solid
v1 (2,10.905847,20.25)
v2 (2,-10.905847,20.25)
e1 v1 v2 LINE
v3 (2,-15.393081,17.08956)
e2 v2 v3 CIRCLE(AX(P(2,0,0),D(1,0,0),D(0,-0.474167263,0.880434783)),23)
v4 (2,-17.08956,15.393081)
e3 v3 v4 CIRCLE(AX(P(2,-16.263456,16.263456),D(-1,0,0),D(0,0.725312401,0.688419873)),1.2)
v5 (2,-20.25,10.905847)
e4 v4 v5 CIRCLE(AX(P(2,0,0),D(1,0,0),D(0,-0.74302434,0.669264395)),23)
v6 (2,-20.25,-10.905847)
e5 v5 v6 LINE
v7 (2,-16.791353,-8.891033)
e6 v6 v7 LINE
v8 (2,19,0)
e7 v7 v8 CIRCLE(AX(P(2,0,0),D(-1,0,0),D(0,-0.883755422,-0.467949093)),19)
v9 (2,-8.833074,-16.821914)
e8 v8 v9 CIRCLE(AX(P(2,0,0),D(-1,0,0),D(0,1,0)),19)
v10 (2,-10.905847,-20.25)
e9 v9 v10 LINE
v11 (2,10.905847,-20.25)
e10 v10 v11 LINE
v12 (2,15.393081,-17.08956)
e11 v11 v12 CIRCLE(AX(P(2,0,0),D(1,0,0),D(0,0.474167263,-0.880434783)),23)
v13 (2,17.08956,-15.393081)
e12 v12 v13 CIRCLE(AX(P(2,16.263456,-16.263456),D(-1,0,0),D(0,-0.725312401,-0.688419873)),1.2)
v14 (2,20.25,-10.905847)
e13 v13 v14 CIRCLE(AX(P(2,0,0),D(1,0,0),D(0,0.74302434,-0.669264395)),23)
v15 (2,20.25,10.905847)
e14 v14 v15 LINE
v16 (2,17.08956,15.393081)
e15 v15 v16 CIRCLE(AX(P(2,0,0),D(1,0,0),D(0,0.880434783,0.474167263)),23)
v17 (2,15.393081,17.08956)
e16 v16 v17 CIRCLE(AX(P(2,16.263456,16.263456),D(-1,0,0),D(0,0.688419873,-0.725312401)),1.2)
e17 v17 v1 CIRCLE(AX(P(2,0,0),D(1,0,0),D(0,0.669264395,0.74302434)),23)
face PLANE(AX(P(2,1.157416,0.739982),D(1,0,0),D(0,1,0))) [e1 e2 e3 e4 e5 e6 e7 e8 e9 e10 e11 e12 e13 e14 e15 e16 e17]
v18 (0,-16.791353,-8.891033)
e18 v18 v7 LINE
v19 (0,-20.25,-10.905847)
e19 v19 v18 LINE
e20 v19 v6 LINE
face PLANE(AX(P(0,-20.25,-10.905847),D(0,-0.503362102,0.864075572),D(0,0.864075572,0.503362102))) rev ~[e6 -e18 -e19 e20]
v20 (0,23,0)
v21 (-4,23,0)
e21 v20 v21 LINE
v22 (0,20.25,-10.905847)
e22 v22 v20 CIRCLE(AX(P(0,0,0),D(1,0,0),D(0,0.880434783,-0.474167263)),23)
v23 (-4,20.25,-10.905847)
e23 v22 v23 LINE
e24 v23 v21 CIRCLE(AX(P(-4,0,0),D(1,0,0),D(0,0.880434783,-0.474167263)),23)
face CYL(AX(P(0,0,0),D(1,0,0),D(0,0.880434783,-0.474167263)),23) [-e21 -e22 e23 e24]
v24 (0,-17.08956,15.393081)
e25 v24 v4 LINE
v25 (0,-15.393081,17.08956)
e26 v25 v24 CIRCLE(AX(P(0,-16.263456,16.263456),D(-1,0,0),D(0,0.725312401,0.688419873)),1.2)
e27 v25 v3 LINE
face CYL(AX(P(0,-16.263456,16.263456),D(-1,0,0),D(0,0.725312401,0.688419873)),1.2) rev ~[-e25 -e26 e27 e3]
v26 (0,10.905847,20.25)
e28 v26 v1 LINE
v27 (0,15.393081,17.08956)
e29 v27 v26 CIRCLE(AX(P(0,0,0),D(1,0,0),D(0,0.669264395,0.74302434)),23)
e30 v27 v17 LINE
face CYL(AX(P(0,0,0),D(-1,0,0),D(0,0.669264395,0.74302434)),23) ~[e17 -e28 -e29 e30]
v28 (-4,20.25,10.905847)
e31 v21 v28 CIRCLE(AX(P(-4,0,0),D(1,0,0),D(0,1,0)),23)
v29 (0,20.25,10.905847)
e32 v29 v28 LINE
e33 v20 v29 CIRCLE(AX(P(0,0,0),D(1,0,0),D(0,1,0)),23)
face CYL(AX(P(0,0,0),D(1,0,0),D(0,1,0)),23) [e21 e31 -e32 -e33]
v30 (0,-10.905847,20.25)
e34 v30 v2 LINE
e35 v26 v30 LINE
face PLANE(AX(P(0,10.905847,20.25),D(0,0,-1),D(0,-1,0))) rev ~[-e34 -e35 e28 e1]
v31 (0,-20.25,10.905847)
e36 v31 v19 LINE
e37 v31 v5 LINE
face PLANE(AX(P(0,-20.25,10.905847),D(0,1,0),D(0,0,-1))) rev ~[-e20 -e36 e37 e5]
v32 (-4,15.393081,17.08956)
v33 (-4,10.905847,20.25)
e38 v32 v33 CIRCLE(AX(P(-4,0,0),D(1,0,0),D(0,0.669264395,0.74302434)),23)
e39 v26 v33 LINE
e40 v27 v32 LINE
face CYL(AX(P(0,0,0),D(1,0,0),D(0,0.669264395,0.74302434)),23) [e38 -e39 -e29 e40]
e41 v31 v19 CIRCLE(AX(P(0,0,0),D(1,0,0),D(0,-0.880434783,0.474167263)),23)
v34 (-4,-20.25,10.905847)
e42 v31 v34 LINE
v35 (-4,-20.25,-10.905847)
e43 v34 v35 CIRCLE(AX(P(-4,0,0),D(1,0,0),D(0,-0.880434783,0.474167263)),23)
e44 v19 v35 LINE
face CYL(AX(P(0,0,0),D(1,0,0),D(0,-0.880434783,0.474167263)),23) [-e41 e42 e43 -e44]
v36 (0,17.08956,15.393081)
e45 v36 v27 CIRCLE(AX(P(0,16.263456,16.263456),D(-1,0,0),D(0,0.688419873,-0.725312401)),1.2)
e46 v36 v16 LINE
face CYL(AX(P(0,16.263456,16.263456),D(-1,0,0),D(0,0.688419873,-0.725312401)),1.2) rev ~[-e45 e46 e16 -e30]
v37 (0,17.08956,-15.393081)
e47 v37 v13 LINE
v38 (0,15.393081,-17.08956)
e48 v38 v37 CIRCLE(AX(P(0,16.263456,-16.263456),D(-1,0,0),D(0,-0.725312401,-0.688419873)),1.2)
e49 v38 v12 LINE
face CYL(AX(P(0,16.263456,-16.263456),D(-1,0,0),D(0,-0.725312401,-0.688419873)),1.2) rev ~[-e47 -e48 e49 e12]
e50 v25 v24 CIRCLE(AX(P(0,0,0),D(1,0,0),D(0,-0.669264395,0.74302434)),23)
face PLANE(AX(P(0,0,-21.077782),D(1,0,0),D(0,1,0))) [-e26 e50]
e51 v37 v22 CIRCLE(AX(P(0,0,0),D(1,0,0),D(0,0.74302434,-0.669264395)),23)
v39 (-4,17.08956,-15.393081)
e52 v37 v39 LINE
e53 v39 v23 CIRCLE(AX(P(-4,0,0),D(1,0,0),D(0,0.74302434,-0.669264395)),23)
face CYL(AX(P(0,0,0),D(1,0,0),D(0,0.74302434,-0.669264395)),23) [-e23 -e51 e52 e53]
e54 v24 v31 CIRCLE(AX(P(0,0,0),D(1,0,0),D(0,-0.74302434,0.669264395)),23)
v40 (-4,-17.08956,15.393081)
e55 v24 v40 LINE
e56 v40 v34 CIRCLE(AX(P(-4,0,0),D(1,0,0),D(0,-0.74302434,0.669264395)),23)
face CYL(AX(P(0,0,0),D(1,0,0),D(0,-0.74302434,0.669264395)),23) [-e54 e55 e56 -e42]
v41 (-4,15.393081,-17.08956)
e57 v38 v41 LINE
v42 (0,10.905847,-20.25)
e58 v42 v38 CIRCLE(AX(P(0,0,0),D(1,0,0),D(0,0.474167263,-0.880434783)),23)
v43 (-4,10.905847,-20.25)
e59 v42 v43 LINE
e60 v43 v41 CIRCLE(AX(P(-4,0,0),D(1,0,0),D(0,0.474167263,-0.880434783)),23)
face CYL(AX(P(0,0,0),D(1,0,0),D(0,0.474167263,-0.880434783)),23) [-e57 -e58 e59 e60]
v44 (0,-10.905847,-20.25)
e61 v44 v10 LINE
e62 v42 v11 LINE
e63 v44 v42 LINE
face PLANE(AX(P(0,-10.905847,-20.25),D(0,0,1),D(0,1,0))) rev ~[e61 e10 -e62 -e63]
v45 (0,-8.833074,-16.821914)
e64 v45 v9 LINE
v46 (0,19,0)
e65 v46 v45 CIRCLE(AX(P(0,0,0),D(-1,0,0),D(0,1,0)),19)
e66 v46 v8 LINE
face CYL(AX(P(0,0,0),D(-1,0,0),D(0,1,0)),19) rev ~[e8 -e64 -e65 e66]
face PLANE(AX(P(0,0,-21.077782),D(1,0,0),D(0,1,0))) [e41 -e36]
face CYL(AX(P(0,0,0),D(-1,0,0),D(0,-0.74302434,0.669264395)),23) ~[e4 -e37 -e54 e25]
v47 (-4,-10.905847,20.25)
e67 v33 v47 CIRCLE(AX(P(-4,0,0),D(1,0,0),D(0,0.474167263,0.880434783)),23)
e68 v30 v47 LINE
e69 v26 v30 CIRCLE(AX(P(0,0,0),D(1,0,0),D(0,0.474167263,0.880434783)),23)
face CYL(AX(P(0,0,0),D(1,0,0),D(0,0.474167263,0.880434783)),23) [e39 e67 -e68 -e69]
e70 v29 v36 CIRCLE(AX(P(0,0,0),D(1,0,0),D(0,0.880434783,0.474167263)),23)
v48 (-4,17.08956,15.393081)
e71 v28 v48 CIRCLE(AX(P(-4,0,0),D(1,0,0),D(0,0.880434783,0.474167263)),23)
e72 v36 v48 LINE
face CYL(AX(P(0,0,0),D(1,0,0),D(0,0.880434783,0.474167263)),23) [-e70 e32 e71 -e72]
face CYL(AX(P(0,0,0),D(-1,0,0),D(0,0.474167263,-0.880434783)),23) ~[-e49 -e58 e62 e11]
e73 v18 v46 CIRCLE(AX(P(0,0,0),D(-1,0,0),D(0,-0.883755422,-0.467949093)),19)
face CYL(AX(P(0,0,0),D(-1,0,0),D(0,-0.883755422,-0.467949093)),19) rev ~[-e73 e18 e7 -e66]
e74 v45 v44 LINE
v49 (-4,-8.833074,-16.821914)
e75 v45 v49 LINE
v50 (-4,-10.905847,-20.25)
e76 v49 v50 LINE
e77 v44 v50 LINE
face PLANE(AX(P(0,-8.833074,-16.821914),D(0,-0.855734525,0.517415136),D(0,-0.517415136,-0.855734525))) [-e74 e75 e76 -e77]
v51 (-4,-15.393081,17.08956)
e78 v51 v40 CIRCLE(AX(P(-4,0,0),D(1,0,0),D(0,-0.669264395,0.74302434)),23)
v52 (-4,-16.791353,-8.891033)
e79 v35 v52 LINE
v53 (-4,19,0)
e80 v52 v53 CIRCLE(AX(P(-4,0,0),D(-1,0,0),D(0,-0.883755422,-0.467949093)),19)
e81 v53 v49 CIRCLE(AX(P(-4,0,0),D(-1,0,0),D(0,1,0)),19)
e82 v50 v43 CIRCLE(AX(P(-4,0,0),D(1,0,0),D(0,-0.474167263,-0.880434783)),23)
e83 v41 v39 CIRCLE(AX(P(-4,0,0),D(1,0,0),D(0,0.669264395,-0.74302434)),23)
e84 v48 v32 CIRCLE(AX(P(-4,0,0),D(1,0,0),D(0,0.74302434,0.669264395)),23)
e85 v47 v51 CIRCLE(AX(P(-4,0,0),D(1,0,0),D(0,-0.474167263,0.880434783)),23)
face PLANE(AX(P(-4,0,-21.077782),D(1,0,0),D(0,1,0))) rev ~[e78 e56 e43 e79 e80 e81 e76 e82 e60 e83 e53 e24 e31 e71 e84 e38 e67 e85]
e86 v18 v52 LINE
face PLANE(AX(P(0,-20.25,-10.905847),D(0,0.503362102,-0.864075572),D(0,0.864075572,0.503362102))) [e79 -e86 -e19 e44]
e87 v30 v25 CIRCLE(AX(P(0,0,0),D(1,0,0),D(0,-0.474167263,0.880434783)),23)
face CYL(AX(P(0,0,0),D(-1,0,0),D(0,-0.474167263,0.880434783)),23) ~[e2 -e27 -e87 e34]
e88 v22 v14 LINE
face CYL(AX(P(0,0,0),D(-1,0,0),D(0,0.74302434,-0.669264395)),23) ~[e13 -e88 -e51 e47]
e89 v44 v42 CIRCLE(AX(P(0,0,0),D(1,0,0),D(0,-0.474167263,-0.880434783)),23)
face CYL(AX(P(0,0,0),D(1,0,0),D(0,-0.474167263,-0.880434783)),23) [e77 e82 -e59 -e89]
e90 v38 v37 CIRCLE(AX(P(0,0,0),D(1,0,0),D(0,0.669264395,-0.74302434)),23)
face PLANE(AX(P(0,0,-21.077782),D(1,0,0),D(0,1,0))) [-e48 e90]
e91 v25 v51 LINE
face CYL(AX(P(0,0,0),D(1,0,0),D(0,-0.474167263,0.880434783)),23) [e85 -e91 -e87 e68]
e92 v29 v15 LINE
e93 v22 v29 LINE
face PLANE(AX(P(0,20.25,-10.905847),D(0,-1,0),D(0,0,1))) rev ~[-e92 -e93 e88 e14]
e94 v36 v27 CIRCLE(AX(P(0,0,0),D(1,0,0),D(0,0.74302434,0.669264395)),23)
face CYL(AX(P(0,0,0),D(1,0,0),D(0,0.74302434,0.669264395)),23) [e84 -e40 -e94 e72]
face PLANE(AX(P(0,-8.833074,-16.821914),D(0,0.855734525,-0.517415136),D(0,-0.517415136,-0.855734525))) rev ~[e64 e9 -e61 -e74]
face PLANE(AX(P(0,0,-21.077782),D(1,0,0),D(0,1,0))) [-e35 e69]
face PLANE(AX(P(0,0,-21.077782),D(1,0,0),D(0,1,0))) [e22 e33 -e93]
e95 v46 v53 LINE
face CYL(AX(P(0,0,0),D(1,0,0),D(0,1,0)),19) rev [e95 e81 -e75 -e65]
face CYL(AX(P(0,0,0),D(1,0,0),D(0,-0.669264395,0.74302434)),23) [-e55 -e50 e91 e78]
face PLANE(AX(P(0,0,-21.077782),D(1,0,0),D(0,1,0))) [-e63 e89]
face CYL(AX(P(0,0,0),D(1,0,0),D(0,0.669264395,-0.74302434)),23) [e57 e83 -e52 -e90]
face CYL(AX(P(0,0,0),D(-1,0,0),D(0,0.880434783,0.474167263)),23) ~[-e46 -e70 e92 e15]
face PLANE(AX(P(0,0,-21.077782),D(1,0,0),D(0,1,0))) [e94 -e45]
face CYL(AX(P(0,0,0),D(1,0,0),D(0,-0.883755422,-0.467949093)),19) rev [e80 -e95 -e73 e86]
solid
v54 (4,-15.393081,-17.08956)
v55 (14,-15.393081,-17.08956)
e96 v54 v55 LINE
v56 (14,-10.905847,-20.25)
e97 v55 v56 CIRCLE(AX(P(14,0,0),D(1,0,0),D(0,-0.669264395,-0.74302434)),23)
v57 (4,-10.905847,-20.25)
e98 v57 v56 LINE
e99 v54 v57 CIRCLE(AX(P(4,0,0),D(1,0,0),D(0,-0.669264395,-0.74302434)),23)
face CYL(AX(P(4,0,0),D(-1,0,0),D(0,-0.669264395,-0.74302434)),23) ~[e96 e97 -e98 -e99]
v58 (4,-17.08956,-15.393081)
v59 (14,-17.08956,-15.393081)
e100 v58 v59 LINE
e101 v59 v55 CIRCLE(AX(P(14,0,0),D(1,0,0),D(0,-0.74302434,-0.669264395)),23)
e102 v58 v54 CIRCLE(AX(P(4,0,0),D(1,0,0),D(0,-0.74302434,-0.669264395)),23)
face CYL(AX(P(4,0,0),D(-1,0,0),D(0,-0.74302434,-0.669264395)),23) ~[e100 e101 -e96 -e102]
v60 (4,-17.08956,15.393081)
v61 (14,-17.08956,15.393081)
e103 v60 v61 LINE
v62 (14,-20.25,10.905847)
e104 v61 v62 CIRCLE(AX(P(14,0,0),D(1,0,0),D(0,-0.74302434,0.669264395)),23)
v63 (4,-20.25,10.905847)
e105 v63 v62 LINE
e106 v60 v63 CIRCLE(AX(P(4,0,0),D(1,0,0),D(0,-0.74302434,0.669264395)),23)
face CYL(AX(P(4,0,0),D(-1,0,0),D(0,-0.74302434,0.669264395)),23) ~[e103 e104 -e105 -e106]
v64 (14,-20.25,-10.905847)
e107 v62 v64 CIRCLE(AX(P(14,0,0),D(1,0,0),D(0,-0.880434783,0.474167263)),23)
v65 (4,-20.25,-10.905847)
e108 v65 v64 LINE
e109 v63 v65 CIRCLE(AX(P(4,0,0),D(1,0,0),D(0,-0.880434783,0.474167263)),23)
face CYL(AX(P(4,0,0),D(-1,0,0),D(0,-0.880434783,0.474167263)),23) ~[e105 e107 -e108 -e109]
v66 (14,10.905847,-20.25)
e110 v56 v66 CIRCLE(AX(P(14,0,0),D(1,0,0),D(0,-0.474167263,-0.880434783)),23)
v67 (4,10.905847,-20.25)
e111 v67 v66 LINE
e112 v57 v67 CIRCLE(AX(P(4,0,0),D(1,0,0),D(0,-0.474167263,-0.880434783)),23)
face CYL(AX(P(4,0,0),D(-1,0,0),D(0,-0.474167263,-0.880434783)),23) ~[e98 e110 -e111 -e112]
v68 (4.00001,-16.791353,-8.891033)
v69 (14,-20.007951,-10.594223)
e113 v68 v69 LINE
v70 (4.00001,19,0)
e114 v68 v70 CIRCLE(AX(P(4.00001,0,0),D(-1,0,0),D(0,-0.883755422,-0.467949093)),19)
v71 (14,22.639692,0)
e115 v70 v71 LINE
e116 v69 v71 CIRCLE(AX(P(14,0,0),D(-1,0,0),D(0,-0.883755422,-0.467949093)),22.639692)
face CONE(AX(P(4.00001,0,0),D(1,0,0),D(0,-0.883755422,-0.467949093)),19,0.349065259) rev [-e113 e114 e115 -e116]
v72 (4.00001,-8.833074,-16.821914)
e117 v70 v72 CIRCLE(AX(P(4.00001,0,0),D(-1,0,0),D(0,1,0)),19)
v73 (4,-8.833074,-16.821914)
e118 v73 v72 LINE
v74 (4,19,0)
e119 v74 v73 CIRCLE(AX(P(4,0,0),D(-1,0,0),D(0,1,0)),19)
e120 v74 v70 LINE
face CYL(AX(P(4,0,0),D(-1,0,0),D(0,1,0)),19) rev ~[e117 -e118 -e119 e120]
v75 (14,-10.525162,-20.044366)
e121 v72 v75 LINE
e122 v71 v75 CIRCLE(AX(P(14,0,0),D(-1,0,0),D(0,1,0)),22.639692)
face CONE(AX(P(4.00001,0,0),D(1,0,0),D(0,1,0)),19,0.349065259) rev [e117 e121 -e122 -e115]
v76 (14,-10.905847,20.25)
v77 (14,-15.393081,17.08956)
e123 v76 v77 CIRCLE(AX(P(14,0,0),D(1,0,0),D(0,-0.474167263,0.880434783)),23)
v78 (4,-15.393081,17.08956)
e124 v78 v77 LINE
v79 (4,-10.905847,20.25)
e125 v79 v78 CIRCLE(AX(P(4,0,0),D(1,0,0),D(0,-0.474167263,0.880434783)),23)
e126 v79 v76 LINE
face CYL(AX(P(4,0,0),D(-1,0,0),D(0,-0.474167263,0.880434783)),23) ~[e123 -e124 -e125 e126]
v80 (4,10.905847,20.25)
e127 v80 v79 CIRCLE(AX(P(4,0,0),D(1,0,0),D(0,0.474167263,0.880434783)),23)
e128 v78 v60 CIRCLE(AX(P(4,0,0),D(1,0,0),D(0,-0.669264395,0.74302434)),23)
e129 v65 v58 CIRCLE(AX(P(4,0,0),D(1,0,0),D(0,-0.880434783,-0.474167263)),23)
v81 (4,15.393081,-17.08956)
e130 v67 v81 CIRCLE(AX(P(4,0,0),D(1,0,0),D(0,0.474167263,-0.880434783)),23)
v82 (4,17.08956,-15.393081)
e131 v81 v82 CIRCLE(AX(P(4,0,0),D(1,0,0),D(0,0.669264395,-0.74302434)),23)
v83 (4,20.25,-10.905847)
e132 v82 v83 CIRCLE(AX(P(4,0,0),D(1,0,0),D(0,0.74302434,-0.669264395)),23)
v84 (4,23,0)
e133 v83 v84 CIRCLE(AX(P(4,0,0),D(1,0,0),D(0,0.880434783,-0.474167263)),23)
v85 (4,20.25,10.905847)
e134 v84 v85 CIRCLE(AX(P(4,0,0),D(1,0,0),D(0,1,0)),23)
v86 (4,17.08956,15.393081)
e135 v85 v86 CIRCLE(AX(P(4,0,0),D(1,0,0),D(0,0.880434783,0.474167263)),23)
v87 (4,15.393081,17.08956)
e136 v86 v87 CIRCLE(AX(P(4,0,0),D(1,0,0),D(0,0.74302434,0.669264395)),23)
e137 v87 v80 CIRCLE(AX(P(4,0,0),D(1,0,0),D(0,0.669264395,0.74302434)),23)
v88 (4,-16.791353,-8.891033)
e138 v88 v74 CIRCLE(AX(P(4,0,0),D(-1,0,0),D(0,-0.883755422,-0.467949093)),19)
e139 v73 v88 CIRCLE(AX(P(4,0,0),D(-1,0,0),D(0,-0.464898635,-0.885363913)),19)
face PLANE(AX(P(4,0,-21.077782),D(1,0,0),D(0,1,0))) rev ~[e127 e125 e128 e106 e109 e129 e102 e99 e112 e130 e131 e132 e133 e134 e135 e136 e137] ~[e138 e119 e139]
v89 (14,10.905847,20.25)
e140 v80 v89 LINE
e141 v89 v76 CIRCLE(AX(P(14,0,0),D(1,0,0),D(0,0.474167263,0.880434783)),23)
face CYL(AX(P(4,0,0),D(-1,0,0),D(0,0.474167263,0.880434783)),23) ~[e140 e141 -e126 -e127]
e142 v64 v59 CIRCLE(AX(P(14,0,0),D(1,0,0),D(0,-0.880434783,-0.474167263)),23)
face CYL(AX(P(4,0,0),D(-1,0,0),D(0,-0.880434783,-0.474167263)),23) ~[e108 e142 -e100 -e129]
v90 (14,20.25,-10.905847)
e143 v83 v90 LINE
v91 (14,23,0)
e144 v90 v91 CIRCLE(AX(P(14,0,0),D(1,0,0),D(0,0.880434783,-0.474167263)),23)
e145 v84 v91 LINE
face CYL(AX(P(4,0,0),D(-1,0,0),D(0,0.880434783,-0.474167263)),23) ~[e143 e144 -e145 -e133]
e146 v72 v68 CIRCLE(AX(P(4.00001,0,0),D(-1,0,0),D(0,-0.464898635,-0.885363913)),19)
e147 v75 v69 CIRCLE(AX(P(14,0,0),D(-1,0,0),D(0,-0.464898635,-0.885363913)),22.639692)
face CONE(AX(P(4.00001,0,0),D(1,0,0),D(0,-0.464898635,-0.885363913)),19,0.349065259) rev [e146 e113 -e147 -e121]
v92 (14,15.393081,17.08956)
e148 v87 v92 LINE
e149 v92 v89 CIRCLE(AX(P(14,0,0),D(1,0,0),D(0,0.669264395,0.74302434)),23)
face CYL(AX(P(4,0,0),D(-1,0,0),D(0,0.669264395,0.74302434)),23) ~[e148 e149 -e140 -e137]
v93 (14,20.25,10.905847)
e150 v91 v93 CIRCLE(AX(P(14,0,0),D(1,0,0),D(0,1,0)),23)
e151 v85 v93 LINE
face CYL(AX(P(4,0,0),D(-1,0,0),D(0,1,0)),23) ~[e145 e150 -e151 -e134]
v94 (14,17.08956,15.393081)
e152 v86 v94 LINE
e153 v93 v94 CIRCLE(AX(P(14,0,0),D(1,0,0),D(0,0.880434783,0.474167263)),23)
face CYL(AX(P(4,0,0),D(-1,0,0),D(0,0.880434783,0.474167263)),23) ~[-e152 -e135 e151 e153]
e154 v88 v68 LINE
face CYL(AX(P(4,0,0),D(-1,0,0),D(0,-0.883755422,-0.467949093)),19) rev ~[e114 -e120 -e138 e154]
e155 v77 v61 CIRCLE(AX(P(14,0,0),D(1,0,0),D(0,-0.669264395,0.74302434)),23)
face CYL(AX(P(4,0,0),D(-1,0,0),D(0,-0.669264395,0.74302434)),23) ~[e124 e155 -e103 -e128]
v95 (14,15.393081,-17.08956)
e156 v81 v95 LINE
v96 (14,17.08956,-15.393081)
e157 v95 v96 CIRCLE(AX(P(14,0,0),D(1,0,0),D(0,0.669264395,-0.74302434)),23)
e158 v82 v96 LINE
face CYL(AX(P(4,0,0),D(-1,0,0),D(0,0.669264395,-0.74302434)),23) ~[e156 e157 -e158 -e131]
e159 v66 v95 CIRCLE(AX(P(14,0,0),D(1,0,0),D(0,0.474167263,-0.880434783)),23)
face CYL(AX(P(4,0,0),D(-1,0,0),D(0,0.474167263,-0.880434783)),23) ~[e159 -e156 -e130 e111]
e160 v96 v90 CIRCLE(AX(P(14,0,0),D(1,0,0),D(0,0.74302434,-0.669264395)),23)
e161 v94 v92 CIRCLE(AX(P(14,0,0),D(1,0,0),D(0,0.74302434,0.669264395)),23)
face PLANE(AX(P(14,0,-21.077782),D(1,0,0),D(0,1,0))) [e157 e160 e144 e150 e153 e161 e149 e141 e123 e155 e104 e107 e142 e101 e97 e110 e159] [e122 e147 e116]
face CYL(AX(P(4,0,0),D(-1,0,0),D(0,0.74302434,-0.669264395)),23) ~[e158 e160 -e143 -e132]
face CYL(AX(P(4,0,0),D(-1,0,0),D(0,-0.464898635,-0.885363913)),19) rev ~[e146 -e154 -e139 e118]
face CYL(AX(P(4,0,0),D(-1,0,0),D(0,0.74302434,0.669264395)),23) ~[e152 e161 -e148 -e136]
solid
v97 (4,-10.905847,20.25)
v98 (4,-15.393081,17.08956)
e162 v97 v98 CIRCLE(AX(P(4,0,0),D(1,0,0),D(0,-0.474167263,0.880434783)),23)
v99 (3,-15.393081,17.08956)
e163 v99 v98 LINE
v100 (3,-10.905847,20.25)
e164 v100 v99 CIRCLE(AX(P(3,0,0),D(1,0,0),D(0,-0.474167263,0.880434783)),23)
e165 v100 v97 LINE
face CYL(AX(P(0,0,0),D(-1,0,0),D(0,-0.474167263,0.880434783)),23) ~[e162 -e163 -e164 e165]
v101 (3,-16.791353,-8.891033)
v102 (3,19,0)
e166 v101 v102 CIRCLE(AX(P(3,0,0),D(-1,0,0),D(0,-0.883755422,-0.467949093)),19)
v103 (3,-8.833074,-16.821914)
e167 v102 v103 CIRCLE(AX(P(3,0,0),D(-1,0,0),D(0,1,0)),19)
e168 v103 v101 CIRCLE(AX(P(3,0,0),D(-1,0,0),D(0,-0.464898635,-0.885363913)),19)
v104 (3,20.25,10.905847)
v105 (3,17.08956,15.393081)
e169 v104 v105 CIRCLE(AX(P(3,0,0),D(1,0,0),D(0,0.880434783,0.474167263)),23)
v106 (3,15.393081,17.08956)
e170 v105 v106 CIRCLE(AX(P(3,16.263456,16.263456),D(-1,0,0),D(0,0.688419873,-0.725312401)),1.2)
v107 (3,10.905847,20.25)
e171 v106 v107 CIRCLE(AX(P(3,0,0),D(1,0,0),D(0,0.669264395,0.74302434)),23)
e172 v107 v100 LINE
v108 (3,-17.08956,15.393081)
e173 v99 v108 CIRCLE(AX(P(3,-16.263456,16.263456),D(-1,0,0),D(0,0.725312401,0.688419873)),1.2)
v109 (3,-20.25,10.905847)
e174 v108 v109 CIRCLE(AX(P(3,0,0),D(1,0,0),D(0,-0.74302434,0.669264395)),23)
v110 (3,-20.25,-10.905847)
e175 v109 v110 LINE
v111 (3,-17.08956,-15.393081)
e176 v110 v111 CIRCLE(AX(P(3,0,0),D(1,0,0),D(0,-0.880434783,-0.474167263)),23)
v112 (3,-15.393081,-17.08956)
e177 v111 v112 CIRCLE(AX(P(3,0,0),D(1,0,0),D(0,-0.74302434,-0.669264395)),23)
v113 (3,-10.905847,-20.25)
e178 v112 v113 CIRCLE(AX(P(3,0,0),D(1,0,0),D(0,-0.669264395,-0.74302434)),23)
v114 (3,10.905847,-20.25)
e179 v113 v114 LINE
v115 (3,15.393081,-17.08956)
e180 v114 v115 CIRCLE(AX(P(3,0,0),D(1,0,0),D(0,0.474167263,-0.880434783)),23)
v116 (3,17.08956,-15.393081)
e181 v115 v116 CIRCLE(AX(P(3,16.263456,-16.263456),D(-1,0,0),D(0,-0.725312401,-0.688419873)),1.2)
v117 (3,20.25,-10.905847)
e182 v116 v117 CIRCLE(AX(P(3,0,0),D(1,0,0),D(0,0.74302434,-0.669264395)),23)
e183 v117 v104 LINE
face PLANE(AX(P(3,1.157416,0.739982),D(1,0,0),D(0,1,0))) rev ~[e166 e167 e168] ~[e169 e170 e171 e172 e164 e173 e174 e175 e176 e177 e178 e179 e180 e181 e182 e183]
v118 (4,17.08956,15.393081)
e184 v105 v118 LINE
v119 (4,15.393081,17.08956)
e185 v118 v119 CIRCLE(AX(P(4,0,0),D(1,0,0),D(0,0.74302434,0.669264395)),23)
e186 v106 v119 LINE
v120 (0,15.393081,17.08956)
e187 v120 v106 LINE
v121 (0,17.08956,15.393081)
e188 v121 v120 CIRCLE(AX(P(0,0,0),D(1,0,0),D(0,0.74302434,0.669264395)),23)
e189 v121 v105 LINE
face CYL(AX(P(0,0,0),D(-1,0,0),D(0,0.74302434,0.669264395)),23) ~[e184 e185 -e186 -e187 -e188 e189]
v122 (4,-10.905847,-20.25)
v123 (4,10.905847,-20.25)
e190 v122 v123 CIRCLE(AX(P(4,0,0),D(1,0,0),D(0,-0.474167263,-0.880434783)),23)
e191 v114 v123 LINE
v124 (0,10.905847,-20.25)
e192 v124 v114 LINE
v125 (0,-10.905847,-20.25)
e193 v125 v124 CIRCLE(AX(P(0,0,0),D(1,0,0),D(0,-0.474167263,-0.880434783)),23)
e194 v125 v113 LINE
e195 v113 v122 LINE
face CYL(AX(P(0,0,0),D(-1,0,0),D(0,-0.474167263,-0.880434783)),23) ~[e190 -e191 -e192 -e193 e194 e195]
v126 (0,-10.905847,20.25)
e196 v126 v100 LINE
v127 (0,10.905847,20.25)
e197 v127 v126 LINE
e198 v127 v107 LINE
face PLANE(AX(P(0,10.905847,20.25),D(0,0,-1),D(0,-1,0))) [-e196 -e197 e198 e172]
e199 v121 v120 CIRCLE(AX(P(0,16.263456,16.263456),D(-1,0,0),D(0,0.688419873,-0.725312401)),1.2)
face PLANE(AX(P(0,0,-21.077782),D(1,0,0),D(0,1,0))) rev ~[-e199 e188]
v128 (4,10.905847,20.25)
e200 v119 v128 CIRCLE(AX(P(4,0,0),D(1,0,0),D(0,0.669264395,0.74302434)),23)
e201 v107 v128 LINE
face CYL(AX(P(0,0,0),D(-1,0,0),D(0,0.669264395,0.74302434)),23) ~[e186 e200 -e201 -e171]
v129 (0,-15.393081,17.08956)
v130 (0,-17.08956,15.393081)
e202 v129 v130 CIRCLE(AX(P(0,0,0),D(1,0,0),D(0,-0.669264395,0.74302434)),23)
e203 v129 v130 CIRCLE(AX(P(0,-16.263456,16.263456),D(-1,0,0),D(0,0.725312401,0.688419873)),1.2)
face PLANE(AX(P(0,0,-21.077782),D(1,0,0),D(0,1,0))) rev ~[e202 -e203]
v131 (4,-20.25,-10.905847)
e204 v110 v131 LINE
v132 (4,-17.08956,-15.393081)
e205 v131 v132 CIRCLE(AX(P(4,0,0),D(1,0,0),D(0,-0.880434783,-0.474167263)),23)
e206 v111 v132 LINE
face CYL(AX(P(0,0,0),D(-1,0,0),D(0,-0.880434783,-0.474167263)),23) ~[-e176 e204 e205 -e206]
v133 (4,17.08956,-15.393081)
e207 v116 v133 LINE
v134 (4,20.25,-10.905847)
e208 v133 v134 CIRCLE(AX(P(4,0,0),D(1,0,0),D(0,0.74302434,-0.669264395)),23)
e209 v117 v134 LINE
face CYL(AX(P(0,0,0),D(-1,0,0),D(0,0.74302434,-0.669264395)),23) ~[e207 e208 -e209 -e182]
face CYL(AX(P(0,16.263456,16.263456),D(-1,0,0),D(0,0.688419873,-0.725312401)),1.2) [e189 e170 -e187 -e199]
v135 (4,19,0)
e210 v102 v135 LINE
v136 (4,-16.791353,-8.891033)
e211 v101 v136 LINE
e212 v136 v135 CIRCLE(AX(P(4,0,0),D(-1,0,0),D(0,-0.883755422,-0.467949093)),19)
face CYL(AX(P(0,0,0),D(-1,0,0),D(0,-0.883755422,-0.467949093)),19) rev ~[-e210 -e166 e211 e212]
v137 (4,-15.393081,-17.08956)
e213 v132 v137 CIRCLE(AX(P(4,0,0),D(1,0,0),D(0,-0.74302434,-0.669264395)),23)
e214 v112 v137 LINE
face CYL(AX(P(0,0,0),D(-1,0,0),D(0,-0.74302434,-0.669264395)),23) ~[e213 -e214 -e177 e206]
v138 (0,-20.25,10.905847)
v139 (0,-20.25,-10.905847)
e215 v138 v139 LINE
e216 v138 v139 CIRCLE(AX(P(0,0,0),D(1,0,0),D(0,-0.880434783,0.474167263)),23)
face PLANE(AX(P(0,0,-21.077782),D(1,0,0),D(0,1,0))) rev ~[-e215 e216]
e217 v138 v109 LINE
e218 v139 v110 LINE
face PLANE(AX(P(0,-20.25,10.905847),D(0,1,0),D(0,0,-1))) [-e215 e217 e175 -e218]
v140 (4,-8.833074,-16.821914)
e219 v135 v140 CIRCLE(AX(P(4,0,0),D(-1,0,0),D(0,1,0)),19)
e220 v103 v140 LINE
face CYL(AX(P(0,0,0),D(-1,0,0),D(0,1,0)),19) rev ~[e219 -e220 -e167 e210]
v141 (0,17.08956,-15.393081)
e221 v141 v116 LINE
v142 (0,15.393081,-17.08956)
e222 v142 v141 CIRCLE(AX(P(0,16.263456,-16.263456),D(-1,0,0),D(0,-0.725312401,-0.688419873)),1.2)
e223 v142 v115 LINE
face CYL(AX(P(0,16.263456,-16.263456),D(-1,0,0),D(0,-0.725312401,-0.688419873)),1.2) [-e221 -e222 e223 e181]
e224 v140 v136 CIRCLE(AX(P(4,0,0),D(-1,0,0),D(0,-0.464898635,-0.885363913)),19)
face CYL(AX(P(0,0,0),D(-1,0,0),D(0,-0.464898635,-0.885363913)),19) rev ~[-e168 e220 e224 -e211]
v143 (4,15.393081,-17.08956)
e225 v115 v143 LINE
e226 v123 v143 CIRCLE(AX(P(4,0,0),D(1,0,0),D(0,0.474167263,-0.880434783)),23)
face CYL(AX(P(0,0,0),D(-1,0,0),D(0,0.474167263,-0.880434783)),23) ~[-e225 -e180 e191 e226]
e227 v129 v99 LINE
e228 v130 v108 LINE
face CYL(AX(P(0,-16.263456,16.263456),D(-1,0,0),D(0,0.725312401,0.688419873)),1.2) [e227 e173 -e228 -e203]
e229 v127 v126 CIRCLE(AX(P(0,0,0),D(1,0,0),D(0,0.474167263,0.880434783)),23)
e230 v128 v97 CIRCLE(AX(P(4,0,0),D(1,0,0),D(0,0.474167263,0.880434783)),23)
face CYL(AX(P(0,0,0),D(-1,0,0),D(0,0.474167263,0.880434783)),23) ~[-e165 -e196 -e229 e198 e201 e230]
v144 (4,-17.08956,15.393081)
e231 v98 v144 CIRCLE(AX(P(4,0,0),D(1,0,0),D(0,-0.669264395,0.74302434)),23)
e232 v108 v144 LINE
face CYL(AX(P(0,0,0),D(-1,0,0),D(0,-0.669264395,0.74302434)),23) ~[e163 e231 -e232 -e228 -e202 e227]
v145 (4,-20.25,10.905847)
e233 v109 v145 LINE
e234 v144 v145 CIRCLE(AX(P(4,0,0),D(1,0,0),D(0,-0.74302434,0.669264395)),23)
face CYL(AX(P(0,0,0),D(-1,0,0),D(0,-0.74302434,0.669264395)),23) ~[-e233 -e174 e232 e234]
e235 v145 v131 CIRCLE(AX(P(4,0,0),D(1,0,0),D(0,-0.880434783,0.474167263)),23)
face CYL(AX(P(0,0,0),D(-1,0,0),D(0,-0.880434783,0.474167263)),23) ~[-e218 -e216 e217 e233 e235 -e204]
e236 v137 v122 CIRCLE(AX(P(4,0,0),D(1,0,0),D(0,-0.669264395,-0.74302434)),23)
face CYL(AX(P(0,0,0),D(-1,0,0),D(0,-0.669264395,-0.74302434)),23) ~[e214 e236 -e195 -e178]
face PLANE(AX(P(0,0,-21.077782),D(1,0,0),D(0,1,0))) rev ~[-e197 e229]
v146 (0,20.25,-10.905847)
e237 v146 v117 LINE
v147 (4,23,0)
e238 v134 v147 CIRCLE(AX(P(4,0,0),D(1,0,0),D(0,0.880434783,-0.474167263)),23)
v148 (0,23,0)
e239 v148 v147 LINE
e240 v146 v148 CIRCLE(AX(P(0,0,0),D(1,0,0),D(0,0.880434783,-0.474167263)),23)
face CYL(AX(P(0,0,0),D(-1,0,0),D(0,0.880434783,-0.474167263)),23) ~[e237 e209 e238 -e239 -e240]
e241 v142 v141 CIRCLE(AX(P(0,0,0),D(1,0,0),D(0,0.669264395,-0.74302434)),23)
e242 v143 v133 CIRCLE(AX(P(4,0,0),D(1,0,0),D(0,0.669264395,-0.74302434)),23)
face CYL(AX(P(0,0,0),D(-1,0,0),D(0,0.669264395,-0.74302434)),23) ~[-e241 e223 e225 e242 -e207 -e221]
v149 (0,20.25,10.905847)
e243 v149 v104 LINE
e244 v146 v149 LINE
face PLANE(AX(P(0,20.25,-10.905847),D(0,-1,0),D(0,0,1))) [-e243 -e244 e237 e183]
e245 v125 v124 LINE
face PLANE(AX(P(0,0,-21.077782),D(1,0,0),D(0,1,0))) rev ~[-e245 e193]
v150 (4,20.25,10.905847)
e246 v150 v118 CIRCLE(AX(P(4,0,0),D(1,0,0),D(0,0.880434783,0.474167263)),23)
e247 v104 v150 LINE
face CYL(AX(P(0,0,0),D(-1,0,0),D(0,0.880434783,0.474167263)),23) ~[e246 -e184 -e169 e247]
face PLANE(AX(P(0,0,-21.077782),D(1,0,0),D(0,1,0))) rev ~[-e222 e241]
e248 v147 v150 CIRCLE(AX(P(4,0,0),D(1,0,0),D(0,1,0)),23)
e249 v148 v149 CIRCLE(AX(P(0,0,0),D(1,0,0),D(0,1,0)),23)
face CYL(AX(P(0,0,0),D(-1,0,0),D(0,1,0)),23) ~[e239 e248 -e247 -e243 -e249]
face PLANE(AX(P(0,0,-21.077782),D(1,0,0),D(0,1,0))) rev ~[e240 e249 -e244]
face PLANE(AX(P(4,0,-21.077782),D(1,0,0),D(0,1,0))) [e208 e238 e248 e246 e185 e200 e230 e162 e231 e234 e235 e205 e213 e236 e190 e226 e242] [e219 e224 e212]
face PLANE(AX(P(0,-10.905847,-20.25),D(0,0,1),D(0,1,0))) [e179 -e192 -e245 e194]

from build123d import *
from build123d import SkipClean  # not in build123d's __all__

# Parameters (mm, degrees)
F1_DEPTH = 4
F2_DEPTH = 3
F3_DEPTH = 2
F4_DEPTH = 4
F5_DEPTH = 10
F6_SIZE2 = 3.639692
F6_SIZE  = 9.99999


# Not quite as in the source:
# - a fillet or chamfer is up to 0.001 mm smaller than in the source, because OpenCascade refuses the exact size


with BuildPart() as f1:
    # F0 (on Right) → F1 (new body)
    with BuildSketch(Plane.YZ):
        with BuildLine():
            ThreePointArc((-10.9058470556, -20.25), (0, -23), (10.9058470556, -20.25))
            Line((10.9058470556, -20.25), (-10.9058470556, -20.25))
        make_face()
        with BuildLine():
            Line((-10.9058470556, -20.25), (10.9058470556, -20.25))
            ThreePointArc((10.9058470556, -20.25), (13.2440741804, -18.8041085698), (15.3930810865, -17.0895598148))
            ThreePointArc((15.3930810865, -17.0895598148), (15.4149278299, -15.4149278299), (17.0895598148, -15.3930810865))
            ThreePointArc((17.0895598148, -15.3930810865), (18.8041085698, -13.2440741804), (20.25, -10.9058470556))
            Line((20.25, -10.9058470556), (20.25, 10.9058470556))
            ThreePointArc((20.25, 10.9058470556), (18.8041085698, 13.2440741804), (17.0895598148, 15.3930810865))
            ThreePointArc((17.0895598148, 15.3930810865), (15.4149278299, 15.4149278299), (15.3930810865, 17.0895598148))
            ThreePointArc((15.3930810865, 17.0895598148), (13.2440741804, 18.8041085698), (10.9058470556, 20.25))
            Line((10.9058470556, 20.25), (-10.9058470556, 20.25))
            ThreePointArc((-10.9058470556, 20.25), (-13.2440741804, 18.8041085698), (-15.3930810865, 17.0895598148))
            ThreePointArc((-15.3930810865, 17.0895598148), (-15.4149278299, 15.4149278299), (-17.0895598148, 15.3930810865))
            ThreePointArc((-17.0895598148, 15.3930810865), (-18.8041085698, 13.2440741804), (-20.25, 10.9058470556))
            Line((-20.25, 10.9058470556), (-20.25, -10.9058470556))
            Line((-20.25, -10.9058470556), (-16.7913530234, -8.8910327658))
            ThreePointArc((-16.7913530234, -8.8910327658), (-4.5806272799, 18.4395730353), (19, 0))
            ThreePointArc((19, 0), (9.8278072985, -16.2608180515), (-8.833074074, -16.8219143501))
            Line((-8.833074074, -16.8219143501), (-10.9058470556, -20.25))
        make_face()
        with BuildLine():
            ThreePointArc((-15.3930810865, -17.0895598148), (-13.2440741804, -18.8041085698), (-10.9058470556, -20.25))
            Line((-10.9058470556, -20.25), (-8.833074074, -16.8219143501))
            ThreePointArc((-8.833074074, -16.8219143501), (-13.4118431505, -13.4581745904), (-16.7913530234, -8.8910327658))
            Line((-16.7913530234, -8.8910327658), (-20.25, -10.9058470556))
            ThreePointArc((-20.25, -10.9058470556), (-18.8041085698, -13.2440741804), (-17.0895598148, -15.3930810865))
            ThreePointArc((-17.0895598148, -15.3930810865), (-15.4149278299, -15.4149278299), (-15.3930810865, -17.0895598148))
        make_face()
        with BuildLine():
            ThreePointArc((17.0895598148, -15.3930810865), (15.4149278299, -15.4149278299), (15.3930810865, -17.0895598148))
            ThreePointArc((15.3930810865, -17.0895598148), (16.2634559673, -16.2634559673), (17.0895598148, -15.3930810865))
        make_face()
        with BuildLine():
            ThreePointArc((-17.0895598148, -15.3930810865), (-16.2634559673, -16.2634559673), (-15.3930810865, -17.0895598148))
            ThreePointArc((-15.3930810865, -17.0895598148), (-15.4149278299, -15.4149278299), (-17.0895598148, -15.3930810865))
        make_face()
        with BuildLine():
            Line((20.25, 10.9058470556), (20.25, -10.9058470556))
            ThreePointArc((20.25, -10.9058470556), (22.3019057482, -5.6236109396), (23, 0))
            ThreePointArc((23, 0), (22.3019057482, 5.6236109396), (20.25, 10.9058470556))
        make_face()
        with BuildLine():
            ThreePointArc((-20.25, 10.9058470556), (-23, 0), (-20.25, -10.9058470556))
            Line((-20.25, -10.9058470556), (-20.25, 10.9058470556))
        make_face()
        with BuildLine():
            ThreePointArc((15.3930810865, 17.0895598148), (15.4149278299, 15.4149278299), (17.0895598148, 15.3930810865))
            ThreePointArc((17.0895598148, 15.3930810865), (16.2634559673, 16.2634559673), (15.3930810865, 17.0895598148))
        make_face()
        with BuildLine():
            ThreePointArc((-15.3930810865, 17.0895598148), (-16.2634559673, 16.2634559673), (-17.0895598148, 15.3930810865))
            ThreePointArc((-17.0895598148, 15.3930810865), (-15.4149278299, 15.4149278299), (-15.3930810865, 17.0895598148))
        make_face()
        with BuildLine():
            Line((-10.9058470556, 20.25), (10.9058470556, 20.25))
            ThreePointArc((10.9058470556, 20.25), (0, 23), (-10.9058470556, 20.25))
        make_face()
    extrude(amount=F1_DEPTH)

    # F0 (on Right) → F2 (cut)
    with BuildSketch(Plane.YZ):
        with BuildLine():
            Line((-10.9058470556, -20.25), (10.9058470556, -20.25))
            ThreePointArc((10.9058470556, -20.25), (13.2440741804, -18.8041085698), (15.3930810865, -17.0895598148))
            ThreePointArc((15.3930810865, -17.0895598148), (15.4149278299, -15.4149278299), (17.0895598148, -15.3930810865))
            ThreePointArc((17.0895598148, -15.3930810865), (18.8041085698, -13.2440741804), (20.25, -10.9058470556))
            Line((20.25, -10.9058470556), (20.25, 10.9058470556))
            ThreePointArc((20.25, 10.9058470556), (18.8041085698, 13.2440741804), (17.0895598148, 15.3930810865))
            ThreePointArc((17.0895598148, 15.3930810865), (15.4149278299, 15.4149278299), (15.3930810865, 17.0895598148))
            ThreePointArc((15.3930810865, 17.0895598148), (13.2440741804, 18.8041085698), (10.9058470556, 20.25))
            Line((10.9058470556, 20.25), (-10.9058470556, 20.25))
            ThreePointArc((-10.9058470556, 20.25), (-13.2440741804, 18.8041085698), (-15.3930810865, 17.0895598148))
            ThreePointArc((-15.3930810865, 17.0895598148), (-15.4149278299, 15.4149278299), (-17.0895598148, 15.3930810865))
            ThreePointArc((-17.0895598148, 15.3930810865), (-18.8041085698, 13.2440741804), (-20.25, 10.9058470556))
            Line((-20.25, 10.9058470556), (-20.25, -10.9058470556))
            Line((-20.25, -10.9058470556), (-16.7913530234, -8.8910327658))
            ThreePointArc((-16.7913530234, -8.8910327658), (-4.5806272799, 18.4395730353), (19, 0))
            ThreePointArc((19, 0), (9.8278072985, -16.2608180515), (-8.833074074, -16.8219143501))
            Line((-8.833074074, -16.8219143501), (-10.9058470556, -20.25))
        make_face()
        with BuildLine():
            ThreePointArc((-15.3930810865, -17.0895598148), (-13.2440741804, -18.8041085698), (-10.9058470556, -20.25))
            Line((-10.9058470556, -20.25), (-8.833074074, -16.8219143501))
            ThreePointArc((-8.833074074, -16.8219143501), (-13.4118431505, -13.4581745904), (-16.7913530234, -8.8910327658))
            Line((-16.7913530234, -8.8910327658), (-20.25, -10.9058470556))
            ThreePointArc((-20.25, -10.9058470556), (-18.8041085698, -13.2440741804), (-17.0895598148, -15.3930810865))
            ThreePointArc((-17.0895598148, -15.3930810865), (-15.4149278299, -15.4149278299), (-15.3930810865, -17.0895598148))
        make_face()
        with BuildLine():
            ThreePointArc((-17.0895598148, -15.3930810865), (-16.2634559673, -16.2634559673), (-15.3930810865, -17.0895598148))
            ThreePointArc((-15.3930810865, -17.0895598148), (-15.4149278299, -15.4149278299), (-17.0895598148, -15.3930810865))
        make_face()
    extrude(amount=F2_DEPTH, mode=Mode.SUBTRACT)


with BuildPart() as f3:
    # F0 (on Right) → F3 (new body)
    with BuildSketch(Plane.YZ):
        with BuildLine():
            Line((-10.9058470556, -20.25), (10.9058470556, -20.25))
            ThreePointArc((10.9058470556, -20.25), (13.2440741804, -18.8041085698), (15.3930810865, -17.0895598148))
            ThreePointArc((15.3930810865, -17.0895598148), (15.4149278299, -15.4149278299), (17.0895598148, -15.3930810865))
            ThreePointArc((17.0895598148, -15.3930810865), (18.8041085698, -13.2440741804), (20.25, -10.9058470556))
            Line((20.25, -10.9058470556), (20.25, 10.9058470556))
            ThreePointArc((20.25, 10.9058470556), (18.8041085698, 13.2440741804), (17.0895598148, 15.3930810865))
            ThreePointArc((17.0895598148, 15.3930810865), (15.4149278299, 15.4149278299), (15.3930810865, 17.0895598148))
            ThreePointArc((15.3930810865, 17.0895598148), (13.2440741804, 18.8041085698), (10.9058470556, 20.25))
            Line((10.9058470556, 20.25), (-10.9058470556, 20.25))
            ThreePointArc((-10.9058470556, 20.25), (-13.2440741804, 18.8041085698), (-15.3930810865, 17.0895598148))
            ThreePointArc((-15.3930810865, 17.0895598148), (-15.4149278299, 15.4149278299), (-17.0895598148, 15.3930810865))
            ThreePointArc((-17.0895598148, 15.3930810865), (-18.8041085698, 13.2440741804), (-20.25, 10.9058470556))
            Line((-20.25, 10.9058470556), (-20.25, -10.9058470556))
            Line((-20.25, -10.9058470556), (-16.7913530234, -8.8910327658))
            ThreePointArc((-16.7913530234, -8.8910327658), (-4.5806272799, 18.4395730353), (19, 0))
            ThreePointArc((19, 0), (9.8278072985, -16.2608180515), (-8.833074074, -16.8219143501))
            Line((-8.833074074, -16.8219143501), (-10.9058470556, -20.25))
        make_face()
    extrude(amount=F3_DEPTH)

    # F0 (on Right) → F4 (join)
    with BuildSketch(Plane.YZ):
        with BuildLine():
            ThreePointArc((-10.9058470556, -20.25), (0, -23), (10.9058470556, -20.25))
            Line((10.9058470556, -20.25), (-10.9058470556, -20.25))
        make_face()
        with BuildLine():
            Line((-10.9058470556, 20.25), (10.9058470556, 20.25))
            ThreePointArc((10.9058470556, 20.25), (0, 23), (-10.9058470556, 20.25))
        make_face()
        with BuildLine():
            Line((20.25, 10.9058470556), (20.25, -10.9058470556))
            ThreePointArc((20.25, -10.9058470556), (22.3019057482, -5.6236109396), (23, 0))
            ThreePointArc((23, 0), (22.3019057482, 5.6236109396), (20.25, 10.9058470556))
        make_face()
        with BuildLine():
            ThreePointArc((-20.25, 10.9058470556), (-23, 0), (-20.25, -10.9058470556))
            Line((-20.25, -10.9058470556), (-20.25, 10.9058470556))
        make_face()
        with BuildLine():
            ThreePointArc((15.3930810865, 17.0895598148), (15.4149278299, 15.4149278299), (17.0895598148, 15.3930810865))
            ThreePointArc((17.0895598148, 15.3930810865), (16.2634559673, 16.2634559673), (15.3930810865, 17.0895598148))
        make_face()
        with BuildLine():
            ThreePointArc((-15.3930810865, 17.0895598148), (-16.2634559673, 16.2634559673), (-17.0895598148, 15.3930810865))
            ThreePointArc((-17.0895598148, 15.3930810865), (-15.4149278299, 15.4149278299), (-15.3930810865, 17.0895598148))
        make_face()
        with BuildLine():
            ThreePointArc((17.0895598148, -15.3930810865), (15.4149278299, -15.4149278299), (15.3930810865, -17.0895598148))
            ThreePointArc((15.3930810865, -17.0895598148), (16.2634559673, -16.2634559673), (17.0895598148, -15.3930810865))
        make_face()
        with BuildLine():
            Line((-10.9058470556, -20.25), (10.9058470556, -20.25))
            ThreePointArc((10.9058470556, -20.25), (13.2440741804, -18.8041085698), (15.3930810865, -17.0895598148))
            ThreePointArc((15.3930810865, -17.0895598148), (15.4149278299, -15.4149278299), (17.0895598148, -15.3930810865))
            ThreePointArc((17.0895598148, -15.3930810865), (18.8041085698, -13.2440741804), (20.25, -10.9058470556))
            Line((20.25, -10.9058470556), (20.25, 10.9058470556))
            ThreePointArc((20.25, 10.9058470556), (18.8041085698, 13.2440741804), (17.0895598148, 15.3930810865))
            ThreePointArc((17.0895598148, 15.3930810865), (15.4149278299, 15.4149278299), (15.3930810865, 17.0895598148))
            ThreePointArc((15.3930810865, 17.0895598148), (13.2440741804, 18.8041085698), (10.9058470556, 20.25))
            Line((10.9058470556, 20.25), (-10.9058470556, 20.25))
            ThreePointArc((-10.9058470556, 20.25), (-13.2440741804, 18.8041085698), (-15.3930810865, 17.0895598148))
            ThreePointArc((-15.3930810865, 17.0895598148), (-15.4149278299, 15.4149278299), (-17.0895598148, 15.3930810865))
            ThreePointArc((-17.0895598148, 15.3930810865), (-18.8041085698, 13.2440741804), (-20.25, 10.9058470556))
            Line((-20.25, 10.9058470556), (-20.25, -10.9058470556))
            Line((-20.25, -10.9058470556), (-16.7913530234, -8.8910327658))
            ThreePointArc((-16.7913530234, -8.8910327658), (-4.5806272799, 18.4395730353), (19, 0))
            ThreePointArc((19, 0), (9.8278072985, -16.2608180515), (-8.833074074, -16.8219143501))
            Line((-8.833074074, -16.8219143501), (-10.9058470556, -20.25))
        make_face()
    with SkipClean():  # cleaning this boolean's faces spoils the solid; the shape is the same uncleaned
        extrude(amount=-F4_DEPTH)


with BuildPart() as f5:
    # F5 (new): a face of the model
    f5_faces = [f1.part.faces().sort_by_distance(p)[0] for p in [
        (4, -10.5973831193, -19.6772435072),
    ]]
    extrude(f5_faces, amount=F5_DEPTH)

    # F6 (size 10 and 3.6397023427 in the source; OpenCascade refuses exactly that, so slightly less here)
    f6_edges = [f5.edges().sort_by_distance(p)[0] for p in [
        (14, 8.833074, 16.821914),
    ]]
    f6_side = f5.faces().sort_by_distance((9, 8.833074, 16.821914))[0]
    chamfer(f6_edges, length=F6_SIZE, length2=F6_SIZE2, reference=f6_side)


solid = Compound([f1.part, f3.part, f5.part])
